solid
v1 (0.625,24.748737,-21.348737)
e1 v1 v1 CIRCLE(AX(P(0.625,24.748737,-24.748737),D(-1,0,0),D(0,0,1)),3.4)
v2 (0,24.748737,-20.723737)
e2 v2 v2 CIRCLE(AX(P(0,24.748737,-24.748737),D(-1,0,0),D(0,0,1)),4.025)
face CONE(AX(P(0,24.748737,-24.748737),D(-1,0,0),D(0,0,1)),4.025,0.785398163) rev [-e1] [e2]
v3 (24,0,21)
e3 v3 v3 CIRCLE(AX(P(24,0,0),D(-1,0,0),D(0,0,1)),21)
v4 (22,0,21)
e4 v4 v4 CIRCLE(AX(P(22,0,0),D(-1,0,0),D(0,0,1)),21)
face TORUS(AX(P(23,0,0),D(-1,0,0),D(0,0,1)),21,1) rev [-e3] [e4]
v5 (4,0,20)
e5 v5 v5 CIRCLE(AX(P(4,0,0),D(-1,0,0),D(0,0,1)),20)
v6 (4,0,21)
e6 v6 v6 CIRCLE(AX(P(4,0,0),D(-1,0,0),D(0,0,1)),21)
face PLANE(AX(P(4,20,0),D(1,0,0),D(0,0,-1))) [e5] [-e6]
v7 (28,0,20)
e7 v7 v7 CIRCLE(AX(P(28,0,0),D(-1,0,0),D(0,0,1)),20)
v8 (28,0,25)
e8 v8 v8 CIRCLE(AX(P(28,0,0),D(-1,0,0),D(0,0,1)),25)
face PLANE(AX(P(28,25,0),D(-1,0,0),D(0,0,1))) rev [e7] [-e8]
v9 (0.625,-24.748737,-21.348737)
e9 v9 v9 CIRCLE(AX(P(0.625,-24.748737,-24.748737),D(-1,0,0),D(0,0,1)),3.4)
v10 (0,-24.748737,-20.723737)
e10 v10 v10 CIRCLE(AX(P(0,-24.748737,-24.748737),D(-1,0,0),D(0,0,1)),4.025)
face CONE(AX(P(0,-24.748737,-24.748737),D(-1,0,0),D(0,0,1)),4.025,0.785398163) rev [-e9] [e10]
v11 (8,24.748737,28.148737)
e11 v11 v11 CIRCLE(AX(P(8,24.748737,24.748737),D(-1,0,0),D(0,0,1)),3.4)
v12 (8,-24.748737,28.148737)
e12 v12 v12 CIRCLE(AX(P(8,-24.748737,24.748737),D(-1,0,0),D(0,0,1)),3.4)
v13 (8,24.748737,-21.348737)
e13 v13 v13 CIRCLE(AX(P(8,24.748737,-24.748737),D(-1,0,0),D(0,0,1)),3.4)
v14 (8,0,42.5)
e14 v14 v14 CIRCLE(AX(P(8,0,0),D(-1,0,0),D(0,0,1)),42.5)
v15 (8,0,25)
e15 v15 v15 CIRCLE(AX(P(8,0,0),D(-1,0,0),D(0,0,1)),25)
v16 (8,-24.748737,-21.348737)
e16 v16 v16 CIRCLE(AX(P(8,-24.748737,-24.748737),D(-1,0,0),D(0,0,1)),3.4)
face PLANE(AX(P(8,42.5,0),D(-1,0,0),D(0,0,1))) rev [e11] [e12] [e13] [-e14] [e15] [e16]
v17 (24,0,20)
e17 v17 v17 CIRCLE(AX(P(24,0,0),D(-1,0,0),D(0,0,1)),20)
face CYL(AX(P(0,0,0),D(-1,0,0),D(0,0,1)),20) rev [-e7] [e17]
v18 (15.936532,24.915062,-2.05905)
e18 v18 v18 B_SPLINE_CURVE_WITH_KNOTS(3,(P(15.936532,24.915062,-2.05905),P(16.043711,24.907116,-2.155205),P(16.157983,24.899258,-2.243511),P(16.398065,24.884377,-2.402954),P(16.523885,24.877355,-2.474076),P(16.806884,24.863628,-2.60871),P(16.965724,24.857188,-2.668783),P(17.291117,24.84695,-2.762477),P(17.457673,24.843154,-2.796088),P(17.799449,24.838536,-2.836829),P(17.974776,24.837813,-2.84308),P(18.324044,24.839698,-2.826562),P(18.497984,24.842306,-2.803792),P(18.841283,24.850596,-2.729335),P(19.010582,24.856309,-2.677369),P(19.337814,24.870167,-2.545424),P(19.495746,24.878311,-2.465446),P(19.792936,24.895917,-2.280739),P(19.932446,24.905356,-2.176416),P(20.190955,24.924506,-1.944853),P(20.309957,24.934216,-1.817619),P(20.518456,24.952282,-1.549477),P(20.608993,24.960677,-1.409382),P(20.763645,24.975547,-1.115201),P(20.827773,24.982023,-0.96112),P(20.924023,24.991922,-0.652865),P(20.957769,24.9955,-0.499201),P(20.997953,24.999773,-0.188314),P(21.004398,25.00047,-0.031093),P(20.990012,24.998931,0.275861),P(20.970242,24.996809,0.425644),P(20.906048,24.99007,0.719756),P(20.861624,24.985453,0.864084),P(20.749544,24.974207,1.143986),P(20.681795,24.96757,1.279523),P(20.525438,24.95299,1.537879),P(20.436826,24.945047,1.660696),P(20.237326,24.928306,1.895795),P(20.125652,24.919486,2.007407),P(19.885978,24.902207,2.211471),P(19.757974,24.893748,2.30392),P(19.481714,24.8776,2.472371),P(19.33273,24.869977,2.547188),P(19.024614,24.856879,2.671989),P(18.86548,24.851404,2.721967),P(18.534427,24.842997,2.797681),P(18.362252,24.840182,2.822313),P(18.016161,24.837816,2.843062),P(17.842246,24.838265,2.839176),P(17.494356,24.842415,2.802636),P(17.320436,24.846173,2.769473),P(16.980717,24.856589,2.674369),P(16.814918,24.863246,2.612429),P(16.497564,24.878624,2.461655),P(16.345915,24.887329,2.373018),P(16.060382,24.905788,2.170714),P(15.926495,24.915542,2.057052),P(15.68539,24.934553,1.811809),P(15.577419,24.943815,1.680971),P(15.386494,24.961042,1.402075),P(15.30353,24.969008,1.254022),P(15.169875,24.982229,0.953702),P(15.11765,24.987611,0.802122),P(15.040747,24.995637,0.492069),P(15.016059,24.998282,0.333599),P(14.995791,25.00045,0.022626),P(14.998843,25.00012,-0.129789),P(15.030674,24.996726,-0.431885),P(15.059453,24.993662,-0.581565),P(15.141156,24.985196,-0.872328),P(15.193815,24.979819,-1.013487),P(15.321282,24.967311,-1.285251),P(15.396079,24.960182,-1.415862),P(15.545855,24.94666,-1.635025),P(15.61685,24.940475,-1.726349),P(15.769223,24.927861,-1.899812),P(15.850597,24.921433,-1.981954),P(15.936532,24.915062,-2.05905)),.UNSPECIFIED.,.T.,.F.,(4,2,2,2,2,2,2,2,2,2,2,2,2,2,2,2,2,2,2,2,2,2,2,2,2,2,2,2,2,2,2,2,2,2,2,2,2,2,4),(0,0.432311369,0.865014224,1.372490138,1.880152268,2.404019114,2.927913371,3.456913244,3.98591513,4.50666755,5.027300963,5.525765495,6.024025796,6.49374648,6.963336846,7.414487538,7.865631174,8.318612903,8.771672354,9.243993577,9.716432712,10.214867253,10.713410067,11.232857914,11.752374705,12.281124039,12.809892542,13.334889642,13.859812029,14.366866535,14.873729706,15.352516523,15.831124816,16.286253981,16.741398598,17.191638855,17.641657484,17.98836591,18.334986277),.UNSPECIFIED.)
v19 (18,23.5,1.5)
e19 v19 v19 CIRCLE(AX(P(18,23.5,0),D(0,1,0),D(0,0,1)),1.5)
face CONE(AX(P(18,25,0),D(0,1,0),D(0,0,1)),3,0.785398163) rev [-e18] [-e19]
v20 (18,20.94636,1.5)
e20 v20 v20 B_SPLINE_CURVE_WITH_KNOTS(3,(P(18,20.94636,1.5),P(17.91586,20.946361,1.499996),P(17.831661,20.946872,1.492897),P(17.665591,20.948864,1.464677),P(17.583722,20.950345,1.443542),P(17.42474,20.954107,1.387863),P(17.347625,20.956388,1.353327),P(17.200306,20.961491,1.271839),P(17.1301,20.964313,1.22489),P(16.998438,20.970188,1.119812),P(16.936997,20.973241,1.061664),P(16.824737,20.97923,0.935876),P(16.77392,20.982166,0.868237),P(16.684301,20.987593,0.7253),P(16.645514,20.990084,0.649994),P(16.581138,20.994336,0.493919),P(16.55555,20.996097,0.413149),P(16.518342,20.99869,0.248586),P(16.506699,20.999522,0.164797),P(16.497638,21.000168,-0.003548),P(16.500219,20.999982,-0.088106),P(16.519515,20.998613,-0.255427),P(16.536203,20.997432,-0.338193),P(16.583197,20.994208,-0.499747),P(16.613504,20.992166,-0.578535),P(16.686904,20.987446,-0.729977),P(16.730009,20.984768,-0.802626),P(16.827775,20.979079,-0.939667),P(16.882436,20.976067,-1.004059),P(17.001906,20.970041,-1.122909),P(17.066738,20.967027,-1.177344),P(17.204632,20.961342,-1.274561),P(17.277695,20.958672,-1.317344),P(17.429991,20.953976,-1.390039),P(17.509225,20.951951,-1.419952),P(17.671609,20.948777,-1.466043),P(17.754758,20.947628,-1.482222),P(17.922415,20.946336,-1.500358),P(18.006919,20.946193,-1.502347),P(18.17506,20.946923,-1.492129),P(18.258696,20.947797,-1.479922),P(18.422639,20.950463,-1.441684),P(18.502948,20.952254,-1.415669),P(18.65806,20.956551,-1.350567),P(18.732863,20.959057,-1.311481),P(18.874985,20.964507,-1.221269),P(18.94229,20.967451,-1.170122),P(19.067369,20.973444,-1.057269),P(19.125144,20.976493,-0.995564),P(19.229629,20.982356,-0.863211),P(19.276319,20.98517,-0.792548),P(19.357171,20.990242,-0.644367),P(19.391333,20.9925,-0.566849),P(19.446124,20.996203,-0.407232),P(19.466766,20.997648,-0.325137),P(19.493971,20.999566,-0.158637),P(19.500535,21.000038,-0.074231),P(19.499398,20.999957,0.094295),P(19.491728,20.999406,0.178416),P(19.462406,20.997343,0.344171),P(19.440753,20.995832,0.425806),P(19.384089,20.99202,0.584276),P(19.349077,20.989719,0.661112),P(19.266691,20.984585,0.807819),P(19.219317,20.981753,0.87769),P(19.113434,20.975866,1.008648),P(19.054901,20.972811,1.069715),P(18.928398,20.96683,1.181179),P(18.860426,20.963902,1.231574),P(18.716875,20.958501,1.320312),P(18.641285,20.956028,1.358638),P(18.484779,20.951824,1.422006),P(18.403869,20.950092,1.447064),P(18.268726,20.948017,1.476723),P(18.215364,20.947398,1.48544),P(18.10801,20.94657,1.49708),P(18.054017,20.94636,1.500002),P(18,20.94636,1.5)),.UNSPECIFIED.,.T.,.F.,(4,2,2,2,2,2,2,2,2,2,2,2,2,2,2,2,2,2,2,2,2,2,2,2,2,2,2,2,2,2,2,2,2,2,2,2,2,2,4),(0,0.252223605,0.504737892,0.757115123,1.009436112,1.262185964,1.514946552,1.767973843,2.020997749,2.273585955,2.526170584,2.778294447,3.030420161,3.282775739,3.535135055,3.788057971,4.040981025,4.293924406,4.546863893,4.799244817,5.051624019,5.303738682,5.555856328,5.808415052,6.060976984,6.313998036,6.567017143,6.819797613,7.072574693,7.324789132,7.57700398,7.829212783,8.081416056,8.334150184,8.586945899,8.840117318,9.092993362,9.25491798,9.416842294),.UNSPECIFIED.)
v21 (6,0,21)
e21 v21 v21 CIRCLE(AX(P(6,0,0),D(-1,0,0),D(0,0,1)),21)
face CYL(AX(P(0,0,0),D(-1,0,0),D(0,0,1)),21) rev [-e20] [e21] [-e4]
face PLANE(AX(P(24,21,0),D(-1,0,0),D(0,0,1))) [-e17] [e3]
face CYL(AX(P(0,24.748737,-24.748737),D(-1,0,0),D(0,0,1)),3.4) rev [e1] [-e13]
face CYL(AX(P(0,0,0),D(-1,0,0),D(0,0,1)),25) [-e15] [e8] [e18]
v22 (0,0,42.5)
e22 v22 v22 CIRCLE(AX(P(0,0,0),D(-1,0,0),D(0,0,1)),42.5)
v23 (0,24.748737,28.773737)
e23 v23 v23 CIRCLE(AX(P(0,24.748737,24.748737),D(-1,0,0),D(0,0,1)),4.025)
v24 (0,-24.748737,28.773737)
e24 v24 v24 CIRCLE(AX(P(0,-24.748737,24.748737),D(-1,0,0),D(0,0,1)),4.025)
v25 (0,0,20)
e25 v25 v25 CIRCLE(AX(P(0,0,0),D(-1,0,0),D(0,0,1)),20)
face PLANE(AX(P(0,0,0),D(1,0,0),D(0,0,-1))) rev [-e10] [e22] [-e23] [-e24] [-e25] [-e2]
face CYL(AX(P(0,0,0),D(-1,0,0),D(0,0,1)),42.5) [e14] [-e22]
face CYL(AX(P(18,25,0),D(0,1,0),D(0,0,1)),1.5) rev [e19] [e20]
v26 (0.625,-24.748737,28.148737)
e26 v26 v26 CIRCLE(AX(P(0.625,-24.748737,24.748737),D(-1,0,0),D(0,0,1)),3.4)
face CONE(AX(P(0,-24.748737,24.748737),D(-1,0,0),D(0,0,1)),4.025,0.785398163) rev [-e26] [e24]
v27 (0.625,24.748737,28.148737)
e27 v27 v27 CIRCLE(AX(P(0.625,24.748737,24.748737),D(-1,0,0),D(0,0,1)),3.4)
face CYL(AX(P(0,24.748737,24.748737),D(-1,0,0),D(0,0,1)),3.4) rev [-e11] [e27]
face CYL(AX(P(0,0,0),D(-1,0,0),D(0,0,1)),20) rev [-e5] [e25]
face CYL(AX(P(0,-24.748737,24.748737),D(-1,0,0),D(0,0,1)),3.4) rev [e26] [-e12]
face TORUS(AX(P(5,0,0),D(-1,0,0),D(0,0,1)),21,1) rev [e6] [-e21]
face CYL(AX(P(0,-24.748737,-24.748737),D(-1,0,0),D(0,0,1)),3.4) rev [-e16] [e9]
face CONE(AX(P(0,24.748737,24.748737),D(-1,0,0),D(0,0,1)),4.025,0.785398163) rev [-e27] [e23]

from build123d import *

# Parameters (mm, degrees)
HOLE_WIZARD_M8_1_D           = 6.8
HOLE_WIZARD_M8_1_CSINK_D     = 8.05
HOLE_WIZARD_M8_1_CSINK_ANGLE = 90
PATTERN_CIRCULAR_1_COUNT     = 4


# Read off the part's stored shape, not the designer's step: Ø3.0mm 暗销孔1
with BuildPart() as part:
    # 草图1 → 旋转1 (revolve)
    with BuildSketch(Plane.XY, mode=Mode.PRIVATE) as revolve_1_sk:
        Polygon((0, 0), (0, 42.5), (8, 42.5), (8, 25), (28, 25), (28, 0), align=None)
    revolve(revolve_1_sk.sketch.rotate(Axis((0, 0, 0), (1, 0, 0)), 90), axis=Axis((0, 0, 0), (1, 0, 0)))

    # 草图2 → 切除-旋转1 (revolve, cut)
    with BuildSketch(Plane.XY, mode=Mode.PRIVATE) as cut_revolve_1_sk:
        with BuildLine():
            Line((0, 0), (0, 20))
            Line((0, 20), (4, 20))
            Line((4, 20), (4, 21))
            ThreePointArc((4, 21), (5, 22), (6, 21))
            Line((6, 21), (22, 21))
            ThreePointArc((22, 21), (23, 22), (24, 21))
            Line((24, 21), (24, 20))
            Line((24, 20), (28, 20))
            Line((28, 20), (28, 0))
            Line((28, 0), (0, 0))
        make_face()
    revolve(cut_revolve_1_sk.sketch.rotate(Axis((0, 0, 0), (1, 0, 0)), 90), axis=Axis((0, 0, 0), (1, 0, 0)), mode=Mode.SUBTRACT)

    # Ø3.0mm 暗销孔1 outline → Ø3.0mm 暗销孔1 (revolve, cut)
    with BuildSketch(Plane(origin=(18, 0, 0), x_dir=(1, 0, 0), z_dir=(0, 0, 1))):
        Polygon((3.000038896, 25.000038896), (0, 25.000038896), (0, 20.946331159), (1.5, 20.946331159), (1.5, 23.5), align=None)
    revolve(axis=Axis((18, 0, 0), (0, 1, 0)), mode=Mode.SUBTRACT)

    # M8 螺纹孔1 (through all)
    with Locations(Plane.ZY):
        with Locations((24.748737342, 24.748737342)):
            hole_wizard_m8_1 = CounterSinkHole(HOLE_WIZARD_M8_1_D / 2, HOLE_WIZARD_M8_1_CSINK_D / 2, counter_sink_angle=HOLE_WIZARD_M8_1_CSINK_ANGLE)

    # 阵列(圆周)1: M8 螺纹孔1 ×4 about axis
    pattern_circular_1_axis = Axis((0, 0, 0), (1, 0, 0))
    for i in range(1, PATTERN_CIRCULAR_1_COUNT):
        add(hole_wizard_m8_1.rotate(pattern_circular_1_axis, i * 360 / PATTERN_CIRCULAR_1_COUNT), mode=Mode.SUBTRACT)


solid = part.part
